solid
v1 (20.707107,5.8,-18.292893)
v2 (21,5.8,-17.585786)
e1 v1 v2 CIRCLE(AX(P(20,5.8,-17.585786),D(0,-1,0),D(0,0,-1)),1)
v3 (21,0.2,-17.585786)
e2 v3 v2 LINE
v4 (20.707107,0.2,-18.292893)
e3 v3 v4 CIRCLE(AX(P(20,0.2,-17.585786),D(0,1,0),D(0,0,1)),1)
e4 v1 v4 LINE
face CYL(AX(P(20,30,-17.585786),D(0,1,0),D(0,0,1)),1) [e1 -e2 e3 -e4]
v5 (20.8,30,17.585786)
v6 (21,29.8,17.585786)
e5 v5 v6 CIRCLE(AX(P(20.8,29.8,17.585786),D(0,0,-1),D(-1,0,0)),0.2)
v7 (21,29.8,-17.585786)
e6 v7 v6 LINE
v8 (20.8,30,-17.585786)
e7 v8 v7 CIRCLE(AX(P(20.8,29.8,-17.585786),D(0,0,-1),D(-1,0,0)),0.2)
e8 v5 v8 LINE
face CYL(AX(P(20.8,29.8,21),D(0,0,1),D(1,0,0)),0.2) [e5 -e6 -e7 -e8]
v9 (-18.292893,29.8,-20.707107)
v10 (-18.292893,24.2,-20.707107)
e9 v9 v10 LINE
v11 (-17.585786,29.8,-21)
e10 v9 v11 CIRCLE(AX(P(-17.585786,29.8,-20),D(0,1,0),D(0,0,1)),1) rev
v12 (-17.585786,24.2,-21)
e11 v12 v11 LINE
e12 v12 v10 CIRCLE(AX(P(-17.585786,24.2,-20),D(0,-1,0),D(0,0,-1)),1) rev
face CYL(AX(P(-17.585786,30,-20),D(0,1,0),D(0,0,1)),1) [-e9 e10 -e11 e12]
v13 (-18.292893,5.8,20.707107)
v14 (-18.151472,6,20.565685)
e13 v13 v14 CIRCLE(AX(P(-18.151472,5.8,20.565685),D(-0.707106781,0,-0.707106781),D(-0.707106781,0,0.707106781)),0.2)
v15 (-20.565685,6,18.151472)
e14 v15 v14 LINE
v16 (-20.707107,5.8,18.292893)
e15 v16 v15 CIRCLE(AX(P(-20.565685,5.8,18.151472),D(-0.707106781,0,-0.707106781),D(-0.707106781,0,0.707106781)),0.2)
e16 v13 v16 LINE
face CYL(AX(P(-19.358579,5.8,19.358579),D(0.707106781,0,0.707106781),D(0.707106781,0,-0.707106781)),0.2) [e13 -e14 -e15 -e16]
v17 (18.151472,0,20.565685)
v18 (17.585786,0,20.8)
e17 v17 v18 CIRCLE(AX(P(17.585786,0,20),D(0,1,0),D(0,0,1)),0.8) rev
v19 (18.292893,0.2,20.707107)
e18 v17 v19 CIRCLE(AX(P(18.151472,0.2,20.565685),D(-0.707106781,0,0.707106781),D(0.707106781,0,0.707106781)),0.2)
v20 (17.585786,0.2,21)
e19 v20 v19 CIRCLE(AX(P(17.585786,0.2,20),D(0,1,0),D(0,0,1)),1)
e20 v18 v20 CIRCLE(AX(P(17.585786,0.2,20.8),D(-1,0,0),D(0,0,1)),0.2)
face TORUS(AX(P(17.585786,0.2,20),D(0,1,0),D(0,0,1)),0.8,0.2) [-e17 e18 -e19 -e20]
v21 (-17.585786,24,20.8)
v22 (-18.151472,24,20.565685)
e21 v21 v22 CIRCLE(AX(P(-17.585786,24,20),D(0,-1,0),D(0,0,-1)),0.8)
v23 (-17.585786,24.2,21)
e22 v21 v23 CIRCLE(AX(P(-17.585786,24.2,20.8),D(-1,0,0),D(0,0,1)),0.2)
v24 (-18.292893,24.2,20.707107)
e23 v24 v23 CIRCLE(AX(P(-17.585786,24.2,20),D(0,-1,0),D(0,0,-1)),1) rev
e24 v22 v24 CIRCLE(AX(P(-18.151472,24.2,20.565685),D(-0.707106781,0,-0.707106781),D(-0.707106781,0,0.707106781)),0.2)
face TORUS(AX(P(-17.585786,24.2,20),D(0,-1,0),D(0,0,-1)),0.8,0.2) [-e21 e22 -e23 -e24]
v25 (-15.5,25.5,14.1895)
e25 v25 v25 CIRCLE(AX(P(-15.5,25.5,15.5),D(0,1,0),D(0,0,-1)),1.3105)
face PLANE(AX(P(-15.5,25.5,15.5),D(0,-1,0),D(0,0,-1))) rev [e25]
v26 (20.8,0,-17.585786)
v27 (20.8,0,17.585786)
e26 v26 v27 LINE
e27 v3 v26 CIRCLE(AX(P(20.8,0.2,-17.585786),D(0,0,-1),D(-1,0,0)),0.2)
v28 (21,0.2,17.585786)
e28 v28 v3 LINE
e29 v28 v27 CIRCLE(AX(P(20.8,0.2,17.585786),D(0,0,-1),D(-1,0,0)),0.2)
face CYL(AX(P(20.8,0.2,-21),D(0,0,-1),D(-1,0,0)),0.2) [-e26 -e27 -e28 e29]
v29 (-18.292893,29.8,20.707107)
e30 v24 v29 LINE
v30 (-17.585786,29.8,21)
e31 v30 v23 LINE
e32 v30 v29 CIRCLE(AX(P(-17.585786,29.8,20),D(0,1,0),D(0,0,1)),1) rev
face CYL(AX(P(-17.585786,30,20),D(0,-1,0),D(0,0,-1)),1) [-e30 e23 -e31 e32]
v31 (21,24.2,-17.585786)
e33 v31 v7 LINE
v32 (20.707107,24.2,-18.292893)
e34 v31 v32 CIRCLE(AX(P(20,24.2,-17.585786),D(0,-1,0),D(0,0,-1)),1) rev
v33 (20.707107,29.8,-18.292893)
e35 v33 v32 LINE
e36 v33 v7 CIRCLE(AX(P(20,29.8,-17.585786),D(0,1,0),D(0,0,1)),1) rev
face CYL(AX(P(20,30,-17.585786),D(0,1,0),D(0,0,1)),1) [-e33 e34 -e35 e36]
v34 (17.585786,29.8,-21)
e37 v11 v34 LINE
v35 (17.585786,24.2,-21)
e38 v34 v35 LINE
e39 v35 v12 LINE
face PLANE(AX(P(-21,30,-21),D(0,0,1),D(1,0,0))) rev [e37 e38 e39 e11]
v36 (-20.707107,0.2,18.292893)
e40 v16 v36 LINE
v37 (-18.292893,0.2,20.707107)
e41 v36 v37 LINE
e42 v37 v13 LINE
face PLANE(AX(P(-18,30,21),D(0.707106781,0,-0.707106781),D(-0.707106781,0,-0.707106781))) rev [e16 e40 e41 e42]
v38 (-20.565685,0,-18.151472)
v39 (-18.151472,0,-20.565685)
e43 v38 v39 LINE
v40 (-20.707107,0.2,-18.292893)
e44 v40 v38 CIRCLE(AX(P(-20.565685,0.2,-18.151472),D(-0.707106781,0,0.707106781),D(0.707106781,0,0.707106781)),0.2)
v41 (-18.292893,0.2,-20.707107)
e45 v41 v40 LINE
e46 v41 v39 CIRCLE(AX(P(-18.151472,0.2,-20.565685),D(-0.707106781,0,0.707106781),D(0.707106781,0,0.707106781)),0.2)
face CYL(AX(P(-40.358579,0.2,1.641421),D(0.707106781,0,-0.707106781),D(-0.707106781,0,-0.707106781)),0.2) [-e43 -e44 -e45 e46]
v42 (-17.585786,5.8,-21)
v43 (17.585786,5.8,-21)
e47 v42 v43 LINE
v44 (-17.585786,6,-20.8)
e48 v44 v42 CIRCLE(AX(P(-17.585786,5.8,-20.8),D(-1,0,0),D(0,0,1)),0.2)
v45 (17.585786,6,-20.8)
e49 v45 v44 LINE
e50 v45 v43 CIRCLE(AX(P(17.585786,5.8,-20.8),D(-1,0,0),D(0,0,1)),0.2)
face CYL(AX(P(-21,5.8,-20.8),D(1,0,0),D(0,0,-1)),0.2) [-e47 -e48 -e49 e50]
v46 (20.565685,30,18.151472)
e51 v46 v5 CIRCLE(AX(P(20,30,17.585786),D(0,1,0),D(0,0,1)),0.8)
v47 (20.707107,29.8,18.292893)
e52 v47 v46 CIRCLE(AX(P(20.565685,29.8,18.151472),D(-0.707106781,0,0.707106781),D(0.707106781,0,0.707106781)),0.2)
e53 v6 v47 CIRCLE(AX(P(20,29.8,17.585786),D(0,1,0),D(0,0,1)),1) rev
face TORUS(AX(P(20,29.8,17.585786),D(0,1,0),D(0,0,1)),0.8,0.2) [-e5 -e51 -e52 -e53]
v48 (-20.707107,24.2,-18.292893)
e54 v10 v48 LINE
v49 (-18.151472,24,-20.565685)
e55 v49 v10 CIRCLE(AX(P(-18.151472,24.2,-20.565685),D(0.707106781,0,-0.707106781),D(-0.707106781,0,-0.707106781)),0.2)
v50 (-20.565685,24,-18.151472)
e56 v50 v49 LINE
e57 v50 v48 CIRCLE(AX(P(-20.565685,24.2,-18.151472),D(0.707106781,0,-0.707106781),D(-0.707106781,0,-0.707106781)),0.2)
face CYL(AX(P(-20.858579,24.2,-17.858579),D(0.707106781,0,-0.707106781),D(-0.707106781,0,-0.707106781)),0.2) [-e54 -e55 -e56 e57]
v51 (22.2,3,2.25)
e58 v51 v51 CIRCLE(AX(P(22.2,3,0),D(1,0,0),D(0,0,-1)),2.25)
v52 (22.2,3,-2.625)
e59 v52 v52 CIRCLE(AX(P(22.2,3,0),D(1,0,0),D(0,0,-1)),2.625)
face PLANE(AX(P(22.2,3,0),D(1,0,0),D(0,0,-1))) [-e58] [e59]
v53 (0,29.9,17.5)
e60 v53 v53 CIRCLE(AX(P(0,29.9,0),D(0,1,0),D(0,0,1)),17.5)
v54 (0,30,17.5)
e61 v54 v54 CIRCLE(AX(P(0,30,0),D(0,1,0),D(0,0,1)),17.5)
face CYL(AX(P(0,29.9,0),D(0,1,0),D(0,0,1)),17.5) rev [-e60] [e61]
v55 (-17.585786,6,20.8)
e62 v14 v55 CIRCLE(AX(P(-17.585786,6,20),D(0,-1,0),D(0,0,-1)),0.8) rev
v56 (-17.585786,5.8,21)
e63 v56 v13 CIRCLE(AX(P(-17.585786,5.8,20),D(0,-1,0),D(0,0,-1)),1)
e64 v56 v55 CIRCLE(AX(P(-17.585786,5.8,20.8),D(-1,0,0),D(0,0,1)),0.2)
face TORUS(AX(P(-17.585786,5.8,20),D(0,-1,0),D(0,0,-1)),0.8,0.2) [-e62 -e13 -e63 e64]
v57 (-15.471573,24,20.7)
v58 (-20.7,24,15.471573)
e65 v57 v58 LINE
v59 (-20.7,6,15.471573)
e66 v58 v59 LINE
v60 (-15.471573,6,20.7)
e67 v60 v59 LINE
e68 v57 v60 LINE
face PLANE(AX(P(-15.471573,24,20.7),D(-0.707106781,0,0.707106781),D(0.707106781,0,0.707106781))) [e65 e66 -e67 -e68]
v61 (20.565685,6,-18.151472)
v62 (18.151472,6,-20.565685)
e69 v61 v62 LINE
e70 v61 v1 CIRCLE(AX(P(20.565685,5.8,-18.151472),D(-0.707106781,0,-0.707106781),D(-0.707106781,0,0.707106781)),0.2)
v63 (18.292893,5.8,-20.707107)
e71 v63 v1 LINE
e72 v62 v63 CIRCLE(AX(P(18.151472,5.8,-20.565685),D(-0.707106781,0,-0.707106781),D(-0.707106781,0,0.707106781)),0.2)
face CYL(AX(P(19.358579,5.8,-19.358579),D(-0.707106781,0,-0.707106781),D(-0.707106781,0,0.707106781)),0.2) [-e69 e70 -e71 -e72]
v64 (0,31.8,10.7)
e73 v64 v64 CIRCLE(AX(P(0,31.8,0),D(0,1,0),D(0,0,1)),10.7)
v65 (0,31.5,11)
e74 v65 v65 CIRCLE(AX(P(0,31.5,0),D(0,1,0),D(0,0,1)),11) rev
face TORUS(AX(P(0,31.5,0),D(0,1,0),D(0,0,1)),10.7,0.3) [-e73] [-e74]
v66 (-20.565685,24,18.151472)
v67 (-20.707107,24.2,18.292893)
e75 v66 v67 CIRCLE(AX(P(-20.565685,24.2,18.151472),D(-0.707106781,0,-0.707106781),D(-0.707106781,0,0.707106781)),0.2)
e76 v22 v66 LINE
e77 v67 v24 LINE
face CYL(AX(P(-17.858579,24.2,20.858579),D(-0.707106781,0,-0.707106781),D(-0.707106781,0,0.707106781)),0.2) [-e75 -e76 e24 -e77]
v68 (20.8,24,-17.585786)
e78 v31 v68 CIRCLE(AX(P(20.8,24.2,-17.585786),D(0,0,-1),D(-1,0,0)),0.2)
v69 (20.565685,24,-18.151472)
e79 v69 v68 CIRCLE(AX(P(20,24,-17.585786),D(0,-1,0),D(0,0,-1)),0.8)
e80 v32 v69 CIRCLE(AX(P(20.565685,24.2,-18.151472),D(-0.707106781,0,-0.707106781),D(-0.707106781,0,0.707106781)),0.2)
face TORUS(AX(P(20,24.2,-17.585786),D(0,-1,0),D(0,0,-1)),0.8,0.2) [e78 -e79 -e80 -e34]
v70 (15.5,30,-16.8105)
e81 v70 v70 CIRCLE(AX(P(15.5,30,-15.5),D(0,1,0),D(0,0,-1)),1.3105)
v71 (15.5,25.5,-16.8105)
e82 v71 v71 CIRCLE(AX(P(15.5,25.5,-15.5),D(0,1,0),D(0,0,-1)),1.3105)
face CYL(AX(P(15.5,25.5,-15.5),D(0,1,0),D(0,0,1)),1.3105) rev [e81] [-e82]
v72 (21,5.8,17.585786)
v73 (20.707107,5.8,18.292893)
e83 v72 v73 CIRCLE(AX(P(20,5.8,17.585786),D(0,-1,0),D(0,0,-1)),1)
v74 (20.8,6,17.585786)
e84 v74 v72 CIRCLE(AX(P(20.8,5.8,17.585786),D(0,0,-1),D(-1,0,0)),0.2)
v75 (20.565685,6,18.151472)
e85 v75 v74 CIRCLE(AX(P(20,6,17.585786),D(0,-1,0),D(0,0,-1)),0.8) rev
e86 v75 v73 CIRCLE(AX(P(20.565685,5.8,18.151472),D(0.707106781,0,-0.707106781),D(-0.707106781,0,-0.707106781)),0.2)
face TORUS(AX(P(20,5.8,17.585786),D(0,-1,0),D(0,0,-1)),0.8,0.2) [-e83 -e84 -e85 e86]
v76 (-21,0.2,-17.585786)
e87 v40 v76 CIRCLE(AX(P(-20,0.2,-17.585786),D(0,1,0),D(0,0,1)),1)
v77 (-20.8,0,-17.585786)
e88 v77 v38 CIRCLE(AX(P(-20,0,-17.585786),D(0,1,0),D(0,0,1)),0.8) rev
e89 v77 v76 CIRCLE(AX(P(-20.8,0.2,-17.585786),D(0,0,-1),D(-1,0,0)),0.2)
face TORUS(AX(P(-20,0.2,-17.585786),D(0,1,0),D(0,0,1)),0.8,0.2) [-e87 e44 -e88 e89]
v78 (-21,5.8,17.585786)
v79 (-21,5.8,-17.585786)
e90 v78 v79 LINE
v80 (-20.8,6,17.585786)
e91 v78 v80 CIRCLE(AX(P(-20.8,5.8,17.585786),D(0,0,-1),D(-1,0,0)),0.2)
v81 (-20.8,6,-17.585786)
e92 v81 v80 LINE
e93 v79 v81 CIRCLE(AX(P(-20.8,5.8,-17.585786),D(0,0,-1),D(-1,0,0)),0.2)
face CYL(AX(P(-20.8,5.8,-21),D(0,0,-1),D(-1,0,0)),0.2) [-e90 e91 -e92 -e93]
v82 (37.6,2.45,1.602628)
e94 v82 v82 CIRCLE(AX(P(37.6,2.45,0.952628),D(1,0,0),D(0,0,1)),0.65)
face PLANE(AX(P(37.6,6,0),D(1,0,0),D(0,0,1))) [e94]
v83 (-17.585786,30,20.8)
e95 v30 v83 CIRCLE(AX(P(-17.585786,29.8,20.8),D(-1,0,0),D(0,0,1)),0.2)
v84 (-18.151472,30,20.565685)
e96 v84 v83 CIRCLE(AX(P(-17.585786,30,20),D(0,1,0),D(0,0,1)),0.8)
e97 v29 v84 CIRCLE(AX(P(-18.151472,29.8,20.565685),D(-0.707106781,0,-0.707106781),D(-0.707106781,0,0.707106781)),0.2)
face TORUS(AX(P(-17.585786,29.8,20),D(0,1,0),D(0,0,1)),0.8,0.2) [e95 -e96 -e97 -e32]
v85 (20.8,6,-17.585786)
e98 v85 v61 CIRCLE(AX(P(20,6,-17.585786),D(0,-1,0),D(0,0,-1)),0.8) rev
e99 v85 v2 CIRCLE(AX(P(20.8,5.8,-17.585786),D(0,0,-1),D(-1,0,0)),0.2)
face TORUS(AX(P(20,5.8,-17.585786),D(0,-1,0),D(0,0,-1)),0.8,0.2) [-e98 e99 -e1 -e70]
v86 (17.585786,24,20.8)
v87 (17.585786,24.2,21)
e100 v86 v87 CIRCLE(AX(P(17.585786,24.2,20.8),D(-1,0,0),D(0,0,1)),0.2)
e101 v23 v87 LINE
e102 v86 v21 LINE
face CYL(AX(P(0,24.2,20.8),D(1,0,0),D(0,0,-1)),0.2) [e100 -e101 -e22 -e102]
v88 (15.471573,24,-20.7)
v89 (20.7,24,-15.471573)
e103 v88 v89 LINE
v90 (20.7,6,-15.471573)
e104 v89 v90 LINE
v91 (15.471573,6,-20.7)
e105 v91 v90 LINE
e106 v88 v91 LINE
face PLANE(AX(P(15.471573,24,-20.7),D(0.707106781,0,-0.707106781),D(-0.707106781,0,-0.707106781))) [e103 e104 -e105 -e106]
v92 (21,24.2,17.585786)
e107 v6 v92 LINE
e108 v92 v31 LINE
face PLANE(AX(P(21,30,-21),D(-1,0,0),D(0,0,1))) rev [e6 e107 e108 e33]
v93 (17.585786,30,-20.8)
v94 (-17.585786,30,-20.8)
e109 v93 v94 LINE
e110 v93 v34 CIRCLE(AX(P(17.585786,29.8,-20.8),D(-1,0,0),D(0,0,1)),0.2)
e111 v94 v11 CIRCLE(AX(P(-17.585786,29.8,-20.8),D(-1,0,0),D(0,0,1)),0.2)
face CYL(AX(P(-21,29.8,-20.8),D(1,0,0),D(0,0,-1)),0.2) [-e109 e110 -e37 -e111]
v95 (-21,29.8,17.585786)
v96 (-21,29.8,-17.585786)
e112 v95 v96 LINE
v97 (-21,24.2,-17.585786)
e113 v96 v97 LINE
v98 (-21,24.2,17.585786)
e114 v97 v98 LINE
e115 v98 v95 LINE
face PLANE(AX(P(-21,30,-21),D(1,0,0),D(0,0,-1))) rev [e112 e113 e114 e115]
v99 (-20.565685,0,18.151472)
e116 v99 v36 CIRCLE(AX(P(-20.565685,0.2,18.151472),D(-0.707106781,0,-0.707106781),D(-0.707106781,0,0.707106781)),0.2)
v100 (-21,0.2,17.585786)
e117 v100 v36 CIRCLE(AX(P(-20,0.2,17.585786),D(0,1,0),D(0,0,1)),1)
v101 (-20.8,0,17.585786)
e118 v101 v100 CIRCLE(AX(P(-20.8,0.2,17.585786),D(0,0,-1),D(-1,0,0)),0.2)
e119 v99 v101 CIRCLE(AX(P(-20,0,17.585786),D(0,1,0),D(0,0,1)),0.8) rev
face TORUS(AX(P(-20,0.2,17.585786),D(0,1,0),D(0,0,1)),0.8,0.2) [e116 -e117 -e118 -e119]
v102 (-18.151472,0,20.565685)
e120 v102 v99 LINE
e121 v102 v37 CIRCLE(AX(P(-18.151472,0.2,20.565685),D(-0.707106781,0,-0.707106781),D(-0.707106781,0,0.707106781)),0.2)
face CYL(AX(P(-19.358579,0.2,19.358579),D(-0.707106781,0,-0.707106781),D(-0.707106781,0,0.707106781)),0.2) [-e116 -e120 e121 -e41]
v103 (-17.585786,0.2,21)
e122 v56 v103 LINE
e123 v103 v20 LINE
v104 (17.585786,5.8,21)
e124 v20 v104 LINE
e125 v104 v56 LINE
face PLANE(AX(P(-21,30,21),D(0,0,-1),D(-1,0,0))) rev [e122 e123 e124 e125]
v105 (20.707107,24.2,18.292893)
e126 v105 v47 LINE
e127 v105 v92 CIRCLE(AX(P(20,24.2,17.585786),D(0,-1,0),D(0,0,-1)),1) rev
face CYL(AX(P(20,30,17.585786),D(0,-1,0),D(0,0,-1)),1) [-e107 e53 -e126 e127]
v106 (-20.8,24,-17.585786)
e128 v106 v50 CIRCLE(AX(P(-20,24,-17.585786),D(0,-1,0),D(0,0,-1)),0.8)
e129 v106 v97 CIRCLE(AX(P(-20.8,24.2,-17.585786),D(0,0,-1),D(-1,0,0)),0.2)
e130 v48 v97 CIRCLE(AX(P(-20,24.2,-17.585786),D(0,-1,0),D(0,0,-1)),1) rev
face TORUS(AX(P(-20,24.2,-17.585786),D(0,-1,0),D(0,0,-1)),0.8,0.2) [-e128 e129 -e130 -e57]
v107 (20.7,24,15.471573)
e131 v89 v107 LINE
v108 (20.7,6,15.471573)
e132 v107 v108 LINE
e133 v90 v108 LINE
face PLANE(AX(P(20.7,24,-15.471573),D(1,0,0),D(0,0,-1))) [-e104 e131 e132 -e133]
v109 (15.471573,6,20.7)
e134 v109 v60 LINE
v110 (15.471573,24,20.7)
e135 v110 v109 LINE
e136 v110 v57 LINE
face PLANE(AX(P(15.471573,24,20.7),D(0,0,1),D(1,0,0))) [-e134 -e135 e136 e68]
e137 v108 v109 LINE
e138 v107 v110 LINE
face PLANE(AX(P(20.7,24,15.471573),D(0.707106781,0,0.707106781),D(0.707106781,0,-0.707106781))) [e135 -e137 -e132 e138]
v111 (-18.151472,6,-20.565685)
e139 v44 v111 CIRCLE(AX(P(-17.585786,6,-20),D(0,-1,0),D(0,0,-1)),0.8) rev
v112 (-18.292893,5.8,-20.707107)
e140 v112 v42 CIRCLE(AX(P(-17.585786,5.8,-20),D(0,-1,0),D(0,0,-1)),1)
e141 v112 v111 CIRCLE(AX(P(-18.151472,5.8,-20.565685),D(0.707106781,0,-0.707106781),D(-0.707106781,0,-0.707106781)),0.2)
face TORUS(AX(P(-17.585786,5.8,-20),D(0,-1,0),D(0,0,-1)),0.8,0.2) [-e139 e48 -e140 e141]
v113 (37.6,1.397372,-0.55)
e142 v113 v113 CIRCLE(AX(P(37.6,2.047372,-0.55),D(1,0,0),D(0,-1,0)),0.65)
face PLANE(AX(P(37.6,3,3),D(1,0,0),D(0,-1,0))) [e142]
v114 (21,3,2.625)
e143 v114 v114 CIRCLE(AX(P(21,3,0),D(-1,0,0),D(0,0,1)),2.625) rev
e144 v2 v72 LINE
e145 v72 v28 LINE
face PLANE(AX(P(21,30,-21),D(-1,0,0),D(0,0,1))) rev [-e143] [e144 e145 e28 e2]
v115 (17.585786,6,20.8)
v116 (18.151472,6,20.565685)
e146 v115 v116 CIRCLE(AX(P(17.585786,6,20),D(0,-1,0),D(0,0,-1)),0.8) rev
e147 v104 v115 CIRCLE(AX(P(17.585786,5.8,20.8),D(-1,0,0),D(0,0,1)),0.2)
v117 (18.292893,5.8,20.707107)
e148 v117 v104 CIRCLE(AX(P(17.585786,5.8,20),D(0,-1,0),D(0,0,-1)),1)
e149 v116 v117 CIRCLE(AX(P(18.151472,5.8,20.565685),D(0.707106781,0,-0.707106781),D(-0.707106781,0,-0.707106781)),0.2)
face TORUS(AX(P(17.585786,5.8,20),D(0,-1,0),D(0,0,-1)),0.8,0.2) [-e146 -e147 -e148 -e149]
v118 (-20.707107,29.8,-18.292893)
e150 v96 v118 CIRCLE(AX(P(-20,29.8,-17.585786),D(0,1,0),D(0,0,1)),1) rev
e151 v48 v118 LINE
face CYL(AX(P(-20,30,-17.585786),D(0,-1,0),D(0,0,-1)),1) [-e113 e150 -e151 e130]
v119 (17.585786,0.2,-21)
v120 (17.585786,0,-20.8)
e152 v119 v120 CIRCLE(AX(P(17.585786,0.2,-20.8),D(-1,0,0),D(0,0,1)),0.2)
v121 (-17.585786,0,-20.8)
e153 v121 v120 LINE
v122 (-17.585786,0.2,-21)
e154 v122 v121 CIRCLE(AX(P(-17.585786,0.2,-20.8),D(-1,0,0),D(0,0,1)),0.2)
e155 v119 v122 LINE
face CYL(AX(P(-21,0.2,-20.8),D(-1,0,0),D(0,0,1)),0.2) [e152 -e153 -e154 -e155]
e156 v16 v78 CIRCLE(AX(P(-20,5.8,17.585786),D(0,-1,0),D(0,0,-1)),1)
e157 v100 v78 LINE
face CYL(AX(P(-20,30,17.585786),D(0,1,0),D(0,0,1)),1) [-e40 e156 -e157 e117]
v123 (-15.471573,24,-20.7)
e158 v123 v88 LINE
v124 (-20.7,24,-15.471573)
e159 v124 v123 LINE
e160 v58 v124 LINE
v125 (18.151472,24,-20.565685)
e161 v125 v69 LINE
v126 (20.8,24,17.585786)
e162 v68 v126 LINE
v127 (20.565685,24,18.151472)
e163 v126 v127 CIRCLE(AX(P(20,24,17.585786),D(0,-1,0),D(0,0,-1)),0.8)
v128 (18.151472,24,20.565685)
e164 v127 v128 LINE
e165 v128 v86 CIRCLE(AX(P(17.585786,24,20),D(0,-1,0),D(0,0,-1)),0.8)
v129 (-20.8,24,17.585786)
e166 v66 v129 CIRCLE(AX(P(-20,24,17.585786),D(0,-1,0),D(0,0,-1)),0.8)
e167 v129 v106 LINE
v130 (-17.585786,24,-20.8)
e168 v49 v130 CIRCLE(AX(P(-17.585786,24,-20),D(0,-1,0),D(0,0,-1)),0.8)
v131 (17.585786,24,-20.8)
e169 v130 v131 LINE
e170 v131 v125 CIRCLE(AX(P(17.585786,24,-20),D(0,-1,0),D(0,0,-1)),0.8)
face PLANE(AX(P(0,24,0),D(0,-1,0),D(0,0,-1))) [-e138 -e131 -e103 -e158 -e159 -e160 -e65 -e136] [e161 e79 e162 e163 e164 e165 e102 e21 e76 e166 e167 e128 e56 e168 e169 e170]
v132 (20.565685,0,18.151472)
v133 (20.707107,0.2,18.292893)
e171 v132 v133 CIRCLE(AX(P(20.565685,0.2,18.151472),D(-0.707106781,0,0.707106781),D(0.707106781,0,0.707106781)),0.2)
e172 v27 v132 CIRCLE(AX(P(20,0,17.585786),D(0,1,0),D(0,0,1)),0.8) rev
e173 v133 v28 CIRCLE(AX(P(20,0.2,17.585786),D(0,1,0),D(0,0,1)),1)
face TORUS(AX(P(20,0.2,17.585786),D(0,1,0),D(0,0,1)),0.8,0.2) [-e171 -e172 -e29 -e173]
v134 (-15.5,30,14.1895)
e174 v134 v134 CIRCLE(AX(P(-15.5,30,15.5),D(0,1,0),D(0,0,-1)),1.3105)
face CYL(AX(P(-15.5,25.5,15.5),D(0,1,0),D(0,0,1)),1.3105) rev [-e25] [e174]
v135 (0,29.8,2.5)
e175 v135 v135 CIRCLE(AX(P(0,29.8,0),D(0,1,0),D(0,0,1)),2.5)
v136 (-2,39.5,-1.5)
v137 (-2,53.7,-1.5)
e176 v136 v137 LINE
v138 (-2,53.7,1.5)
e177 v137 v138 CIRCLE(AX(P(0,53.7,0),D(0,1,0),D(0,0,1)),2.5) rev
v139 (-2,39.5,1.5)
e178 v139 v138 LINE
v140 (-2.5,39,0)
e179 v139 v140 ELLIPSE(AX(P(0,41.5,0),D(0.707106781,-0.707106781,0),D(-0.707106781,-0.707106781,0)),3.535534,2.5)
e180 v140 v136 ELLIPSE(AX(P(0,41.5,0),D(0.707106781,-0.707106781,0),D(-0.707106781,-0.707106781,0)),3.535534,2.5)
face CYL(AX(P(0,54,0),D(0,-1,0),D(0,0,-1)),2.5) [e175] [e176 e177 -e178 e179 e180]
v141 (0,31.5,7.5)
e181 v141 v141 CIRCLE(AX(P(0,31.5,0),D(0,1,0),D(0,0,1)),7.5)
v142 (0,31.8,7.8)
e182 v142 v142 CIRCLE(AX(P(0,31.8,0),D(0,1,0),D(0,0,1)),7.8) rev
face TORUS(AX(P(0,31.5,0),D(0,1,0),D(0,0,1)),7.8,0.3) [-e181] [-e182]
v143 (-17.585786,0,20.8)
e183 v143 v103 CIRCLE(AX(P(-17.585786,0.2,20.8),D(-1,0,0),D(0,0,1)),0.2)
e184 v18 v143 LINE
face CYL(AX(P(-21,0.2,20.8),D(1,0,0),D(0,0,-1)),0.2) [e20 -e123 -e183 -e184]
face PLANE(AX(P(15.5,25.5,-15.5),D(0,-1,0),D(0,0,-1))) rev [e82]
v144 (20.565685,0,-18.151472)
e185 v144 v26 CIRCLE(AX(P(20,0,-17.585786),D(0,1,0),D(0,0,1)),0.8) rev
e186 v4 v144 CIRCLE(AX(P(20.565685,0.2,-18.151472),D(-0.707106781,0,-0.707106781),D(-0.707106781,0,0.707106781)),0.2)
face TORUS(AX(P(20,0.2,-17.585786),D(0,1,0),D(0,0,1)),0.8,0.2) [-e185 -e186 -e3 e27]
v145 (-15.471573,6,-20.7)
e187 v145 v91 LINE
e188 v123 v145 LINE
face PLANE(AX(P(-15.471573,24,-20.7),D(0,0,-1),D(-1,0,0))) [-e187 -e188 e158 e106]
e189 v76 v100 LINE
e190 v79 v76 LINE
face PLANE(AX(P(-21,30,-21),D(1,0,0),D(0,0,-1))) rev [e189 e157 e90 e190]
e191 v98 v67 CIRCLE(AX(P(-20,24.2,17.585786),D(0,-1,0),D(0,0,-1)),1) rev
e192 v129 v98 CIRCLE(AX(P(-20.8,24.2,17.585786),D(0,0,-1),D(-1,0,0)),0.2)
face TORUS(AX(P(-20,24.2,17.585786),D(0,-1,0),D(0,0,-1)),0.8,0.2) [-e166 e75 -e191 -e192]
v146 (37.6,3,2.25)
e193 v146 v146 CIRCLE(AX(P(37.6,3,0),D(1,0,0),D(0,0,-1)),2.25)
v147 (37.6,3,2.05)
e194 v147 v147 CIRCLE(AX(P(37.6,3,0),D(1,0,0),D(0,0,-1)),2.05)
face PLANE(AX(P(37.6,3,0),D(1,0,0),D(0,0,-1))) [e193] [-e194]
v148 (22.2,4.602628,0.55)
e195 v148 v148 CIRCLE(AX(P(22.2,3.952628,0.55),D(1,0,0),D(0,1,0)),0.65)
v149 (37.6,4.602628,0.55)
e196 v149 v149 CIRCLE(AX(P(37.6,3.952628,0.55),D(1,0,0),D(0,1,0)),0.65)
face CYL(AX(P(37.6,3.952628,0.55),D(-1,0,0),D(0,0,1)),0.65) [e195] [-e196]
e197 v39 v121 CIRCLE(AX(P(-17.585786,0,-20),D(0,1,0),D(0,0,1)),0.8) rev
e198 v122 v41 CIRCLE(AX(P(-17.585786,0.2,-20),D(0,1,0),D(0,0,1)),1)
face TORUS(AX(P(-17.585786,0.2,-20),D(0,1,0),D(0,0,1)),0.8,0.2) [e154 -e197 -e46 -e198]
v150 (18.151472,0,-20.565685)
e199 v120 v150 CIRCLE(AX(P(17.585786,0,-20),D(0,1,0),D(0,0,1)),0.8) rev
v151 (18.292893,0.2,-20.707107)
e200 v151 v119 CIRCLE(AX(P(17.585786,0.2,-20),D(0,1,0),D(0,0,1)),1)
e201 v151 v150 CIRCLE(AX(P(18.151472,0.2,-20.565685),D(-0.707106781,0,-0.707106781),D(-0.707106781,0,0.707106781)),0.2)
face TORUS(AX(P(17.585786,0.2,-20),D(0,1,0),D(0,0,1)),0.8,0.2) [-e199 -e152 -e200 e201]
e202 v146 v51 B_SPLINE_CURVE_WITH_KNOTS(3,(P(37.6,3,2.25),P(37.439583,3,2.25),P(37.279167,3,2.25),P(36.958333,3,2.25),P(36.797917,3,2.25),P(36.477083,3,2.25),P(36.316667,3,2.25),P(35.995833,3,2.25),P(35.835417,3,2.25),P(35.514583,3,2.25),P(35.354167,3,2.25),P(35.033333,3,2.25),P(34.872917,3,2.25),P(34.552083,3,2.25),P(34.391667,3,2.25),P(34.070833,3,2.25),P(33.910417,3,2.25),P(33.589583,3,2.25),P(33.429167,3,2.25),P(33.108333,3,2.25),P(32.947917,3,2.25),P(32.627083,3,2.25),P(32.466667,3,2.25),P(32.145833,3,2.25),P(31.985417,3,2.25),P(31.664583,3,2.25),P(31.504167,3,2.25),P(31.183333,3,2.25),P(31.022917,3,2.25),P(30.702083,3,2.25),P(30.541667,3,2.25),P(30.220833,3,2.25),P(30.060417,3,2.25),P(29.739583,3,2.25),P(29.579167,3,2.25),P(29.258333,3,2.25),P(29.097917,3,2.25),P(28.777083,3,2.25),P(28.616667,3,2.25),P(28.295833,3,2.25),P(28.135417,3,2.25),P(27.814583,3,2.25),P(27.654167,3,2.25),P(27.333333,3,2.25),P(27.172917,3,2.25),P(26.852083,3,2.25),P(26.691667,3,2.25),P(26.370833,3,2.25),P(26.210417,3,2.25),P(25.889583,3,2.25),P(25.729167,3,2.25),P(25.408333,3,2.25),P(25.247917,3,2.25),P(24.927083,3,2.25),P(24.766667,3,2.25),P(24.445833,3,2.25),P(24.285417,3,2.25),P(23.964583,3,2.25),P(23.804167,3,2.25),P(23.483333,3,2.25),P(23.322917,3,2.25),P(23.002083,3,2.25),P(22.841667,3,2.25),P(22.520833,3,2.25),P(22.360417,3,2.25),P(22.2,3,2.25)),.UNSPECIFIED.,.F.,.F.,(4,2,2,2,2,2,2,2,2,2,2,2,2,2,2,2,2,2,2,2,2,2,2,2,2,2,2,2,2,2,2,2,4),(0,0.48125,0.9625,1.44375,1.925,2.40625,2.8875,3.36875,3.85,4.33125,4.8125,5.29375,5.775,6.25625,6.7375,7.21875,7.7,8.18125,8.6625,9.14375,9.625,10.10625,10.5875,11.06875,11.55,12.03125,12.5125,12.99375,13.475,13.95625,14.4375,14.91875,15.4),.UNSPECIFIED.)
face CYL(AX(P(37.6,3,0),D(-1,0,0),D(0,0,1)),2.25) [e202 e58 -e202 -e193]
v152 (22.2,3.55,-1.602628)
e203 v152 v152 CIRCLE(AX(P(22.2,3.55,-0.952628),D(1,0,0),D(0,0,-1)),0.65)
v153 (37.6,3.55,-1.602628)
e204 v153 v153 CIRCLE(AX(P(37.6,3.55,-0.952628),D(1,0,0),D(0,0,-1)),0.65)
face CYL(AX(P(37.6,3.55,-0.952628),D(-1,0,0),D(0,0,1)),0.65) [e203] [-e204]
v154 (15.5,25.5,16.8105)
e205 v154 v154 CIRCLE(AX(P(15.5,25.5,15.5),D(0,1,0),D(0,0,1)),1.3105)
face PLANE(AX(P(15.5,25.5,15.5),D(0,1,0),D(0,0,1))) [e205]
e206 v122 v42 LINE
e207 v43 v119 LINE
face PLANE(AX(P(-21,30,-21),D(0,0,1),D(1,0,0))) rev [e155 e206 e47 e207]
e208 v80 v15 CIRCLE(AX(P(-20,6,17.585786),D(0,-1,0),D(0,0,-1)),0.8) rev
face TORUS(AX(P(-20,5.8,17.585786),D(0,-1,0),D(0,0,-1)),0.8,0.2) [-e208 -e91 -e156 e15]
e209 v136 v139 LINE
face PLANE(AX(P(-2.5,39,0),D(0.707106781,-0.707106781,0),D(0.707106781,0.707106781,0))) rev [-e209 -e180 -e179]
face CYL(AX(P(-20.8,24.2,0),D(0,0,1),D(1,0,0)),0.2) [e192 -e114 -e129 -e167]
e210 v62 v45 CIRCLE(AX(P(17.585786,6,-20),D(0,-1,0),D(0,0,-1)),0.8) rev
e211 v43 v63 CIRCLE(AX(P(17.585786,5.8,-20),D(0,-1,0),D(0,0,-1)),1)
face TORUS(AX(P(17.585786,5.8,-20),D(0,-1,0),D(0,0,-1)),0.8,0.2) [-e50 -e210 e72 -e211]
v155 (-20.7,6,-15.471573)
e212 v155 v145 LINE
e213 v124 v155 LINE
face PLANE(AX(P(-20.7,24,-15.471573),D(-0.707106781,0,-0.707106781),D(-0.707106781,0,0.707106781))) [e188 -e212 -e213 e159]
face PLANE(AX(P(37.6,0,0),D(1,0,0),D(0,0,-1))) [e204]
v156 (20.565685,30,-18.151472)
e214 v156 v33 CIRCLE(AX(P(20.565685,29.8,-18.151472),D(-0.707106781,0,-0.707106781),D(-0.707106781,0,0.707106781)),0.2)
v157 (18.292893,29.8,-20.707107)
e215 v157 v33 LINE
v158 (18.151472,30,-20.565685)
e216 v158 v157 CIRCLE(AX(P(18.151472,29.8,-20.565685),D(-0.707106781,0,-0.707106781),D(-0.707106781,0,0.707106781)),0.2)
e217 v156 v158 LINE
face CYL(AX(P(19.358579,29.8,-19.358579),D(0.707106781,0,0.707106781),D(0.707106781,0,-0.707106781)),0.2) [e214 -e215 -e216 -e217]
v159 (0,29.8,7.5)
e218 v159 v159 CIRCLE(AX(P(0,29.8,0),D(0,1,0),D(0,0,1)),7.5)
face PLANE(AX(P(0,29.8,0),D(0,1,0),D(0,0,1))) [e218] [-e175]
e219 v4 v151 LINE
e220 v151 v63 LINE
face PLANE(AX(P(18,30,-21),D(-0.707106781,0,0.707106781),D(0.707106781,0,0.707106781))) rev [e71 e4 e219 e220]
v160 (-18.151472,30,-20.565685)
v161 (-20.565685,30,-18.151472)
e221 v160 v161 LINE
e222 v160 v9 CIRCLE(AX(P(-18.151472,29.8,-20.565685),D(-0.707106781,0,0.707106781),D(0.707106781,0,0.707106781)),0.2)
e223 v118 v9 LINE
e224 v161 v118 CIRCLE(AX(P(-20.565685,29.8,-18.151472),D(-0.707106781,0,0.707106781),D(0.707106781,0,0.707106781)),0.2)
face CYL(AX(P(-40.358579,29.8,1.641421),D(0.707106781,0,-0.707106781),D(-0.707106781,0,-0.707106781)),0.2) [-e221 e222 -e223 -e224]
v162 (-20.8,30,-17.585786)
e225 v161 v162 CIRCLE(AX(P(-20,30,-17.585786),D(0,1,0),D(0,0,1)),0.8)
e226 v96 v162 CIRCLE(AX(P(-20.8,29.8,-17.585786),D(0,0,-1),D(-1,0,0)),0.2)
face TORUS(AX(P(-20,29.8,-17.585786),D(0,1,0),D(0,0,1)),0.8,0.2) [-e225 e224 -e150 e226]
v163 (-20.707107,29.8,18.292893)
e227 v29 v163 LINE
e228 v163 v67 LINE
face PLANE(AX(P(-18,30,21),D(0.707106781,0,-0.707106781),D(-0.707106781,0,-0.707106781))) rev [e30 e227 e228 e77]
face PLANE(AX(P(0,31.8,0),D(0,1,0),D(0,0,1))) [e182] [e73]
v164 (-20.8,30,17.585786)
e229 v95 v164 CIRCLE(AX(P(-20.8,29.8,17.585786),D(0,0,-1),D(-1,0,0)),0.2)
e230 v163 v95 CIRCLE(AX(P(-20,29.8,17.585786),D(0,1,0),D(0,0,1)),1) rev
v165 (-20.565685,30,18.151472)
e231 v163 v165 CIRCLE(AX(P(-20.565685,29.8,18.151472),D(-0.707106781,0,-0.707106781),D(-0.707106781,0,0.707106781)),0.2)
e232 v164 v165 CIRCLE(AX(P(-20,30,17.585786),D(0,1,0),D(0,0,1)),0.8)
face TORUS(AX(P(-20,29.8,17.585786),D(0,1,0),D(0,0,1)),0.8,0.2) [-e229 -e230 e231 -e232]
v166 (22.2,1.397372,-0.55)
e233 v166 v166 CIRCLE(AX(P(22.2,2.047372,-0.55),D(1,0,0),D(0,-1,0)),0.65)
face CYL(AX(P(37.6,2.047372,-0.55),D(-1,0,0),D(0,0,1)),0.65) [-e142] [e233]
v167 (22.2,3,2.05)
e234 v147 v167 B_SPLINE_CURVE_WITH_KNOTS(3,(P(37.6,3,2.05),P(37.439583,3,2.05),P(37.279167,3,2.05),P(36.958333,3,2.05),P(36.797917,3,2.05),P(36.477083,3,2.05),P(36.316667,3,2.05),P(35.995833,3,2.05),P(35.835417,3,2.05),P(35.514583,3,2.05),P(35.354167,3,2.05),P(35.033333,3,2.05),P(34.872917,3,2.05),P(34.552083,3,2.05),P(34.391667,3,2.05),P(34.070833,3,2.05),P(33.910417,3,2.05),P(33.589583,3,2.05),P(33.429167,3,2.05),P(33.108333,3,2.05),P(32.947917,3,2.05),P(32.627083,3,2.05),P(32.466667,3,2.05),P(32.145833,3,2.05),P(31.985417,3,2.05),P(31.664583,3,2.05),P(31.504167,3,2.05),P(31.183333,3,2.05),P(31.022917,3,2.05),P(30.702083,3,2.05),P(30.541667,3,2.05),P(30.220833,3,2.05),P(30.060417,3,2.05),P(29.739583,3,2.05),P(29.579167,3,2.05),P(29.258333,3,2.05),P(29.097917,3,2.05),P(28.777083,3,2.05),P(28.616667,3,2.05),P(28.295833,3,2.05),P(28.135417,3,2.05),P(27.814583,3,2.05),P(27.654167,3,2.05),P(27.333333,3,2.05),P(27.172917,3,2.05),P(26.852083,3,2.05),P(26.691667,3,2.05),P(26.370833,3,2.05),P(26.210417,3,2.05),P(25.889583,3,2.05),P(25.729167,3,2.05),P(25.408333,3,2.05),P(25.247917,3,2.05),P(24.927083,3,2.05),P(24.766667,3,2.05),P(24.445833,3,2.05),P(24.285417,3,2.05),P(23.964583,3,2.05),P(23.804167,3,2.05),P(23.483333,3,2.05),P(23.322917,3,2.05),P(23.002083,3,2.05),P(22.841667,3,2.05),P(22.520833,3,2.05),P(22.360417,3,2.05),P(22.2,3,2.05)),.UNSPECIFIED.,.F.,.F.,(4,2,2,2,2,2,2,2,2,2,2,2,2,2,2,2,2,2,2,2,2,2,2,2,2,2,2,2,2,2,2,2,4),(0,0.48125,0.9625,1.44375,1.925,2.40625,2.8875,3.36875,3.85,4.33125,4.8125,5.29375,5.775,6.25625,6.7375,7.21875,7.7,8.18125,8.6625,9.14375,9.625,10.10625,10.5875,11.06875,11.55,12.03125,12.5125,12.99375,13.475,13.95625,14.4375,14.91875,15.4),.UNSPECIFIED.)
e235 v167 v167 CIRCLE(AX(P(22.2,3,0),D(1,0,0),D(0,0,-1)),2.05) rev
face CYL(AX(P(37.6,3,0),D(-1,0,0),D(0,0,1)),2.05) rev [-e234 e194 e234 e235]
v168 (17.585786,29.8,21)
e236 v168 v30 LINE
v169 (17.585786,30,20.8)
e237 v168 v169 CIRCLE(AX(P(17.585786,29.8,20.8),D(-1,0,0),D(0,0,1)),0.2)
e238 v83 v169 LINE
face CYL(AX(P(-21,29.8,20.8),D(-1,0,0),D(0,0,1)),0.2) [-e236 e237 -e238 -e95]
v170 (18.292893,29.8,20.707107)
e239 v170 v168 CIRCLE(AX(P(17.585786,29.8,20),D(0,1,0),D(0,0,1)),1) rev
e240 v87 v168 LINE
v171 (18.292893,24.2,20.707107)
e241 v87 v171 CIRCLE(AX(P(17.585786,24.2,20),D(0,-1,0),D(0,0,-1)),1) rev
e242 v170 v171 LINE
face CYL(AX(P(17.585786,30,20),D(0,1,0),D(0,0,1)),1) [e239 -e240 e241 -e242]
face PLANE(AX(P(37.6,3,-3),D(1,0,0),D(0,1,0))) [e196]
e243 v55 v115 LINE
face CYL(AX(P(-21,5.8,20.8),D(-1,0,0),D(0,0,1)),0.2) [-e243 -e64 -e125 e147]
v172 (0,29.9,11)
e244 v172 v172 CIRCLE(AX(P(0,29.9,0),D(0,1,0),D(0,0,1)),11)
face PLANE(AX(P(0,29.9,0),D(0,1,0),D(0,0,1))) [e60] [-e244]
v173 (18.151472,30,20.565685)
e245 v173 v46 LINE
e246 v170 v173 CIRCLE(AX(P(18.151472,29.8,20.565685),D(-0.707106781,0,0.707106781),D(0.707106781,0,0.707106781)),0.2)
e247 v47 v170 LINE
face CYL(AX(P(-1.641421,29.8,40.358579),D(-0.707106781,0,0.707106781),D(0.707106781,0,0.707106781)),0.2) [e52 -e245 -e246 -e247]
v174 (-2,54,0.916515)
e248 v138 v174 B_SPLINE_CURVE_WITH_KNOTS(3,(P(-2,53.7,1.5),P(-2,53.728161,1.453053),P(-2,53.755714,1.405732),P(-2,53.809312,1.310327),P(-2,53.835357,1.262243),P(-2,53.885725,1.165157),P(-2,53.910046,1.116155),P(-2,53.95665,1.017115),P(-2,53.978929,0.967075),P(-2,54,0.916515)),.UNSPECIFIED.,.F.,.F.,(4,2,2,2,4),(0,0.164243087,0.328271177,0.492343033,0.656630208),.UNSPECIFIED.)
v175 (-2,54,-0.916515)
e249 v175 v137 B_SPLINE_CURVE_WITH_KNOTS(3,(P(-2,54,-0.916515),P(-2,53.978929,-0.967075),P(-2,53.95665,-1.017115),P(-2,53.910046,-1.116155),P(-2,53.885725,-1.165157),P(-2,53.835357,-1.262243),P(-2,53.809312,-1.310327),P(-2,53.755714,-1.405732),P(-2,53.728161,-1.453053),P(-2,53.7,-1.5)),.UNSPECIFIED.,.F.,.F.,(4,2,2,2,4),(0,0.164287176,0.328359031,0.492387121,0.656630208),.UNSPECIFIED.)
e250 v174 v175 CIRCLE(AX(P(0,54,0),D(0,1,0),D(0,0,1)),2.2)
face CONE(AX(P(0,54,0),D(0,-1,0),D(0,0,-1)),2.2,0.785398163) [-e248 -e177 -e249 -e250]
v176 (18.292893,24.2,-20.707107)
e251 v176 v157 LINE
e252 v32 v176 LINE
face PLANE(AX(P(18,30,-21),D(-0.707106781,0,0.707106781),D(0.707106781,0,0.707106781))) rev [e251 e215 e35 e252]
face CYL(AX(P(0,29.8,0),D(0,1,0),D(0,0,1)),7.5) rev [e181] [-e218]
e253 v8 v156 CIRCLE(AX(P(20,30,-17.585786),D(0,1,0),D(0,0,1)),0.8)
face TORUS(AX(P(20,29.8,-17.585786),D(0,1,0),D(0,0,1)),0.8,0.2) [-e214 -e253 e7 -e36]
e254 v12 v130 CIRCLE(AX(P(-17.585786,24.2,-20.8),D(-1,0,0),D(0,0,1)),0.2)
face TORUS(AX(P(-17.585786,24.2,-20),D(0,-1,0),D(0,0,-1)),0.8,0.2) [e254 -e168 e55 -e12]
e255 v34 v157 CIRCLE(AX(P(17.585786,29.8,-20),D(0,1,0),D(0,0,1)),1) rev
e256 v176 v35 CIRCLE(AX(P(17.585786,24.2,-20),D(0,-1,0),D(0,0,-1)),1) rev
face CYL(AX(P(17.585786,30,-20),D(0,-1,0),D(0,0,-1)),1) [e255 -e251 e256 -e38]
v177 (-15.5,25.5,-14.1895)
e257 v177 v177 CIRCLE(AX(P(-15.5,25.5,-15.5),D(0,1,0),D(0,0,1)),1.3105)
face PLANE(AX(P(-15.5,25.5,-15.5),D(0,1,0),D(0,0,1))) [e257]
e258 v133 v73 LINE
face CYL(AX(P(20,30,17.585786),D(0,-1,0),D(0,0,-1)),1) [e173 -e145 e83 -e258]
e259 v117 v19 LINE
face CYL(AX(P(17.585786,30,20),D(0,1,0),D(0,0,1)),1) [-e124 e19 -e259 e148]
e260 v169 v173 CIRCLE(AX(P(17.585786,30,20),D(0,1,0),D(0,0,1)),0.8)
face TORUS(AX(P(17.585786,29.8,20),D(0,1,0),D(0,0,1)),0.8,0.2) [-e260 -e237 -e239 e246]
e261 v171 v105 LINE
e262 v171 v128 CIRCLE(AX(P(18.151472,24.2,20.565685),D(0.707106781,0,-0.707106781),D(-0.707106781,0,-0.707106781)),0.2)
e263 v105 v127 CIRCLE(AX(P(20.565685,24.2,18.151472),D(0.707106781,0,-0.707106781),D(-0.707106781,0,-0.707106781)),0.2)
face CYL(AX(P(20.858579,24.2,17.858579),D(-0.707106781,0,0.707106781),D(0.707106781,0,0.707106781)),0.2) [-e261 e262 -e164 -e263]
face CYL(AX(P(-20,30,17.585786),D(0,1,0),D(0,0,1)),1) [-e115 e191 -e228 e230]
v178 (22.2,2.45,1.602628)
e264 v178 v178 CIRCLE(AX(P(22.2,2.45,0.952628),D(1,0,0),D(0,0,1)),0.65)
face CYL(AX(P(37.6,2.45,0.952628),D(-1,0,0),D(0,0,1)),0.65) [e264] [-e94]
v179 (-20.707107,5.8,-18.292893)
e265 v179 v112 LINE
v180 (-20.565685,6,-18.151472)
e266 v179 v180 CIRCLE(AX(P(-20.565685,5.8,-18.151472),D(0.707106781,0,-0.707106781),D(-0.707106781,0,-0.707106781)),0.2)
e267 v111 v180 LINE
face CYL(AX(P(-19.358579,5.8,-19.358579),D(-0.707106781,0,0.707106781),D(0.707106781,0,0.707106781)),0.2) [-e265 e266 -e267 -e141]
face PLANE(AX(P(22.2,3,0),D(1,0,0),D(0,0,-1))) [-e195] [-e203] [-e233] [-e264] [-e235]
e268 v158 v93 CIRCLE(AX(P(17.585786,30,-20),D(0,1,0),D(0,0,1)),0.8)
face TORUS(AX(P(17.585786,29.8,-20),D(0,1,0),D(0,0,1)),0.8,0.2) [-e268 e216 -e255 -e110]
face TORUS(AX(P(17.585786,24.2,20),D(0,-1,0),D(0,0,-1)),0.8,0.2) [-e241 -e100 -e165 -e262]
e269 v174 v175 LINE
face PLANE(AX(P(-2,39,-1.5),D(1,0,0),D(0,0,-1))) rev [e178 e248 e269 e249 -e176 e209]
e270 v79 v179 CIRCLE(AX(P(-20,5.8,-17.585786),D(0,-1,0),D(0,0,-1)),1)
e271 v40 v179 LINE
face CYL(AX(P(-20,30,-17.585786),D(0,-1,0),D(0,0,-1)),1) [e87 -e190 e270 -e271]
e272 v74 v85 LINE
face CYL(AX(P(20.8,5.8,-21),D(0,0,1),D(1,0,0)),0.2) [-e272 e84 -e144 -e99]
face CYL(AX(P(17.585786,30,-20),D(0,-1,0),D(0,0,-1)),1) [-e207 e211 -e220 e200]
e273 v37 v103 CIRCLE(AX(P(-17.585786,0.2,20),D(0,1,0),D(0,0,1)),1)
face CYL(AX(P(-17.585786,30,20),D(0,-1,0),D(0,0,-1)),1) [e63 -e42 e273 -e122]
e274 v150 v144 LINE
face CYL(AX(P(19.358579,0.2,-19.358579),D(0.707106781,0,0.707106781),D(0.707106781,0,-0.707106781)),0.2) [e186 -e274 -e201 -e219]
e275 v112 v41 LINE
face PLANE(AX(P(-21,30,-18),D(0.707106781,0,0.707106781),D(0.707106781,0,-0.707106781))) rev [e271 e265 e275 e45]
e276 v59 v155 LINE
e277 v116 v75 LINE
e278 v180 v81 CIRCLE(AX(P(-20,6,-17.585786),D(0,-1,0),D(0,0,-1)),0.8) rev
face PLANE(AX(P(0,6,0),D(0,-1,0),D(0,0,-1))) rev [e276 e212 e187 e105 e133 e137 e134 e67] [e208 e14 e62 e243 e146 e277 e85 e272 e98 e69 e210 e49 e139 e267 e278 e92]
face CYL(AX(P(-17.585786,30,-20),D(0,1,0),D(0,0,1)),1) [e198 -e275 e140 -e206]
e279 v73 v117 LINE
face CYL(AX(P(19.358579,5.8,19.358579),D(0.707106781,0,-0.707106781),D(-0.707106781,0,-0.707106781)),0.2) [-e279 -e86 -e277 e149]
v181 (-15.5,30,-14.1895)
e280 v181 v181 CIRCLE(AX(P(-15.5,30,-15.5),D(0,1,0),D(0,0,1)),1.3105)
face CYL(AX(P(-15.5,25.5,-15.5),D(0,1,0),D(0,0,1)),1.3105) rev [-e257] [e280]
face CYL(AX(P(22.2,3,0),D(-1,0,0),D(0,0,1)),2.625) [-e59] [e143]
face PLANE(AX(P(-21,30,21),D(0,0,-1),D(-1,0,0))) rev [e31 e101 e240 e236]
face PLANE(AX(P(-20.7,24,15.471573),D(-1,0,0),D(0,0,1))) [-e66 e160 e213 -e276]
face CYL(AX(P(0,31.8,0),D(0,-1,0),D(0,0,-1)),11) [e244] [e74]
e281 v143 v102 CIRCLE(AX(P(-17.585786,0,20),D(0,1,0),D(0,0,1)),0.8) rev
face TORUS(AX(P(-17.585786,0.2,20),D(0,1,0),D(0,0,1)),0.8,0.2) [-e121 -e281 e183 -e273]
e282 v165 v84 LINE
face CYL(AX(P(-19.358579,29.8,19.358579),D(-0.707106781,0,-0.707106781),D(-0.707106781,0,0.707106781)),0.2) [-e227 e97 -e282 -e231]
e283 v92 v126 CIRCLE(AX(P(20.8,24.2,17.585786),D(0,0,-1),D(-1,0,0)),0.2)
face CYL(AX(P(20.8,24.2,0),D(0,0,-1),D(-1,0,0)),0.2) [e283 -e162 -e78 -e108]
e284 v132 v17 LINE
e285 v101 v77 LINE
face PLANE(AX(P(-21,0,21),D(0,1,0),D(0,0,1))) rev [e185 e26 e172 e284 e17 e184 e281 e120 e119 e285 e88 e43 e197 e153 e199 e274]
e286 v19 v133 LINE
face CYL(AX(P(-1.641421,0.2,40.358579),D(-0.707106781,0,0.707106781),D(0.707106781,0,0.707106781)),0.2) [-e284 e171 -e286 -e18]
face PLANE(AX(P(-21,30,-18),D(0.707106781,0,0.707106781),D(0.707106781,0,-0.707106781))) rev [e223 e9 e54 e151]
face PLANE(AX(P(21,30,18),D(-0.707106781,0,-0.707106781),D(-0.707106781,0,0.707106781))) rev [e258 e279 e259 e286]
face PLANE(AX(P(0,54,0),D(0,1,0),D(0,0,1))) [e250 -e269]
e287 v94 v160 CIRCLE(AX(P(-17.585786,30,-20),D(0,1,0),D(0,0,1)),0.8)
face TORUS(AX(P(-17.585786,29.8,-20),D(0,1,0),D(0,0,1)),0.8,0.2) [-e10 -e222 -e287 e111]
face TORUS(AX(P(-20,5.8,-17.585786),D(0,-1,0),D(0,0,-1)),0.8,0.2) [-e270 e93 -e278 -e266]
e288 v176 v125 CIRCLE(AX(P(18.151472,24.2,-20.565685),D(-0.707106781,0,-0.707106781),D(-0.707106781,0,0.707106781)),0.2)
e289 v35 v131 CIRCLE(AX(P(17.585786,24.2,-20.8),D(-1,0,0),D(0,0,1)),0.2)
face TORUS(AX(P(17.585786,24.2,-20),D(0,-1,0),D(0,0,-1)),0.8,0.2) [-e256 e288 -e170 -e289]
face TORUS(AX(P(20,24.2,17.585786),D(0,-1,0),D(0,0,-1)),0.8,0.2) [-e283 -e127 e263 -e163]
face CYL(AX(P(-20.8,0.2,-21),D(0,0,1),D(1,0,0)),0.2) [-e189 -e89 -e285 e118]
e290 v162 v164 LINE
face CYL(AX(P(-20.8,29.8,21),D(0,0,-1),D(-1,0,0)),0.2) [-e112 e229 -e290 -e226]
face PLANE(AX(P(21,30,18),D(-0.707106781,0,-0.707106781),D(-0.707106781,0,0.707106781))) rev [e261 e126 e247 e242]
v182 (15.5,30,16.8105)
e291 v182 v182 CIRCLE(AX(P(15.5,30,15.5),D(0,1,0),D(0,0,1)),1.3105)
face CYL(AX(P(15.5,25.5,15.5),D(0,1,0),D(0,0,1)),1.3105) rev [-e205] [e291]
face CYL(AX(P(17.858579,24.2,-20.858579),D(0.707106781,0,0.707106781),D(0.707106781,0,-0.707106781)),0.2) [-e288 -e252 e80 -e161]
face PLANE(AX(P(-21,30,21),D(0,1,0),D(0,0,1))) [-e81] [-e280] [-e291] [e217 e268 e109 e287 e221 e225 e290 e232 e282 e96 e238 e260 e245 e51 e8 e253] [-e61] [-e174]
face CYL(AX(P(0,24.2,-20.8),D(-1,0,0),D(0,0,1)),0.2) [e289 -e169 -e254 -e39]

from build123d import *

# Parameters (mm, degrees)
SKETCH_1_W               = 42
SKETCH_1_H               = 42
EXTRUDE_1_DEPTH          = 30
CHAMFER_3_SIZE           = 3
SKETCH_2_R               = 11
EXTRUDE_2_DEPTH          = 1.8
SKETCH_3_R               = 2.5
EXTRUDE_3_DEPTH          = 24
SKETCH_4_OUTSIDE_W       = 60.054
SKETCH_4_OUTSIDE_H       = 60.054
CUT_EXTRUDE_1_DEPTH      = 18
FILLET_2_R               = 1
FILLET_3_R               = 0.2
CUT_EXTRUDE_START        = -15
CUT_EXTRUDE_5_DEPTH      = 15
CHAMFER_5_SIZE           = 0.3
CHAMFER_4_SIZE           = 0.5
SKETCH_6_R               = 1.3105
CUT_EXTRUDE_2_DEPTH      = 4.5
CUT_EXTRUDE_START_2      = -2
SKETCH_7_R               = 7.5
SKETCH_7_R_2             = 2.5
CUT_EXTRUDE_3_DEPTH      = 2
SKETCH_8_R               = 2.625
EXTRUDE_5_DEPTH          = 1.2
SKETCH_9_R               = 2.25
SKETCH_9_R_2             = 2.05
EXTRUDE_6_DEPTH          = 15.4
SKETCH_10_R              = 0.65
EXTRUDE_8_DEPTH          = 15.4
CUT_EXTRUDE_START_3      = -0.1
SKETCH_15_R              = 17.5
SKETCH_15_R_2            = 11
CUT_EXTRUDE_6_DEPTH      = 0.1
FILLET_4_R               = 0.3
PATTERN_CIRCULAR_3_COUNT = 4


with BuildPart() as part:
    # 草图1 → 凸台-拉伸1 (new body)
    with BuildSketch(Plane(origin=(0, 0, 0), x_dir=(1, 0, 0), z_dir=(0, 1, 0))):
        Rectangle(SKETCH_1_W, SKETCH_1_H)
    extrude(amount=EXTRUDE_1_DEPTH)

    # 倒角3
    chamfer_3_edges = [part.edges().sort_by_distance(p)[0] for p in [
        (-21, 15, -21),
        (21, 15, -21),
        (21, 15, 21),
        (-21, 15, 21),
    ]]
    chamfer(chamfer_3_edges, length=CHAMFER_3_SIZE)

    # 草图2 → 凸台-拉伸2 (add)
    with BuildSketch(Plane(origin=(0, 30, 0), x_dir=(1, 0, 0), z_dir=(0, 1, 0))):
        with Locations(Location((0, 0, 0), (0, 0, 270))):
            Circle(SKETCH_2_R)
    extrude(amount=EXTRUDE_2_DEPTH)

    # 草图3 → 凸台-拉伸3 (add)
    with BuildSketch(Plane(origin=(0, 30, 0), x_dir=(1, 0, 0), z_dir=(0, 1, 0))):
        with Locations(Location((0, 0, 0), (0, 0, 270))):
            Circle(SKETCH_3_R)
    extrude(amount=EXTRUDE_3_DEPTH)

    # 草图4 outside → 切除-拉伸1 (cut)
    with BuildSketch(Plane.XZ.offset(-6)):
        Rectangle(SKETCH_4_OUTSIDE_W, SKETCH_4_OUTSIDE_H)
        Polygon((15.471572875, 20.7), (-15.471572875, 20.7), (-20.7, 15.471572875), (-20.7, -15.471572875), (-15.471572875, -20.7), (15.471572875, -20.7), (20.7, -15.471572875), (20.7, 15.471572875), align=None, mode=Mode.SUBTRACT)
    extrude(amount=-CUT_EXTRUDE_1_DEPTH, mode=Mode.SUBTRACT)

    # 圆角2
    fillet_2_edges = [part.edges().sort_by_distance(p)[0] for p in [
        (-18, 3, -21),
        (18, 27, -21),
        (21, 27, 18),
        (21, 3, -18),
        (-18, 27, 21),
        (18, 3, 21),
        (-21, 27, -18),
        (-21, 3, 18),
        (-18, 27, -21),
        (-21, 3, -18),
        (-21, 27, 18),
        (-18, 3, 21),
        (18, 27, 21),
        (21, 3, 18),
        (21, 27, -18),
        (18, 3, -21),
    ]]
    fillet(fillet_2_edges, radius=FILLET_2_R)

    # 圆角3
    fillet_3_edges = [part.edges().sort_by_distance(p)[0] for p in [
        (21, 6, 0),
        (21, 0, 0),
        (0, 0, -21),
        (19.5, 0, -19.5),
        (19.5, 0, 19.5),
        (0, 0, 21),
        (-19.5, 0, 19.5),
        (-21, 0, 0),
        (-19.5, 0, -19.5),
        (-20.923879533, 0, -17.96846987),
        (-17.96846987, 0, -20.923879533),
        (17.96846987, 0, -20.923879533),
        (20.923879533, 0, -17.96846987),
        (-20.923879533, 0, 17.96846987),
        (-17.96846987, 0, 20.923879533),
        (17.96846987, 0, 20.923879533),
        (20.923879533, 0, 17.96846987),
        (19.5, 6, 19.5),
        (19.5, 6, -19.5),
        (0, 6, -21),
        (-19.5, 6, -19.5),
        (-21, 6, 0),
        (-19.5, 6, 19.5),
        (0, 6, 21),
        (-20.923879533, 6, -17.96846987),
        (-17.96846987, 6, -20.923879533),
        (17.96846987, 6, -20.923879533),
        (20.923879533, 6, -17.96846987),
        (-20.923879533, 6, 17.96846987),
        (-17.96846987, 6, 20.923879533),
        (17.96846987, 6, 20.923879533),
        (20.923879533, 6, 17.96846987),
        (0, 24, -21),
        (0, 30, -21),
        (21, 30, 0),
        (19.5, 30, -19.5),
        (-19.5, 30, -19.5),
        (-21, 30, 0),
        (-19.5, 30, 19.5),
        (0, 30, 21),
        (19.5, 30, 19.5),
        (-20.923879533, 30, 17.96846987),
        (-17.96846987, 30, 20.923879533),
        (17.96846987, 30, 20.923879533),
        (20.923879533, 30, 17.96846987),
        (17.96846987, 30, -20.923879533),
        (20.923879533, 30, -17.96846987),
        (-20.923879533, 30, -17.96846987),
        (-17.96846987, 30, -20.923879533),
        (-19.5, 24, -19.5),
        (0, 24, 21),
        (-19.5, 24, 19.5),
        (-21, 24, 0),
        (19.5, 24, -19.5),
        (21, 24, 0),
        (19.5, 24, 19.5),
        (-20.923879533, 24, 17.96846987),
        (-17.96846987, 24, 20.923879533),
        (17.96846987, 24, 20.923879533),
        (20.923879533, 24, 17.96846987),
        (17.96846987, 24, -20.923879533),
        (20.923879533, 24, -17.96846987),
        (-20.923879533, 24, -17.96846987),
        (-17.96846987, 24, -20.923879533),
    ]]
    fillet(fillet_3_edges, radius=FILLET_3_R)

    # 草图14 → 切除-拉伸5 (cut)
    with BuildSketch(Plane(origin=(0, 54, 0), x_dir=(1, 0, 0), z_dir=(0, 1, 0)).offset(CUT_EXTRUDE_START)):
        with BuildLine():
            Line((-2, 1.5), (-2, -1.5))
            ThreePointArc((-2, -1.5), (-2.5, 0), (-2, 1.5))
        make_face()
    extrude(amount=CUT_EXTRUDE_5_DEPTH, mode=Mode.SUBTRACT)

    # 倒角5
    chamfer_5_edges = [part.edges().sort_by_distance(p)[0] for p in [
        (2.236067977, 54, -1.118033989),
    ]]
    chamfer(chamfer_5_edges, length=CHAMFER_5_SIZE)

    # 倒角4
    chamfer_4_edges = [part.edges().sort_by_distance(p)[0] for p in [
        (-2, 39, 0),
    ]]
    chamfer(chamfer_4_edges, length=CHAMFER_4_SIZE - 0.0001)  # a hair under: the kernel refuses the full size

    # 草图6 → 切除-拉伸2 (cut)
    with BuildSketch(Plane(origin=(0, 30, 0), x_dir=(1, 0, 0), z_dir=(0, 1, 0))):
        with Locations(Location((-15.5, 15.5, 0), (0, 0, 270))):
            Circle(SKETCH_6_R)
        with Locations(Location((15.5, 15.5, 0), (0, 0, 90))):
            Circle(SKETCH_6_R)
        with Locations(Location((15.5, -15.5, 0), (0, 0, 270))):
            Circle(SKETCH_6_R)
        with Locations(Location((-15.5, -15.5, 0), (0, 0, 90))):
            Circle(SKETCH_6_R)
    extrude(amount=-CUT_EXTRUDE_2_DEPTH, mode=Mode.SUBTRACT)

    # 草图7 → 切除-拉伸3 (cut)
    with BuildSketch(Plane(origin=(0, 31.8, 0), x_dir=(1, 0, 0), z_dir=(0, 1, 0)).offset(CUT_EXTRUDE_START_2)):
        with Locations(Location((0, 0, 0), (0, 0, 270))):
            Circle(SKETCH_7_R)
        with Locations(Location((0, 0, 0), (0, 0, 143.130102354))):
            Circle(SKETCH_7_R_2, mode=Mode.SUBTRACT)
    extrude(amount=CUT_EXTRUDE_3_DEPTH, mode=Mode.SUBTRACT)

    # 草图8 → 凸台-拉伸5 (add)
    with BuildSketch(Plane(origin=(21, 0, 0), x_dir=(0, 0, -1), z_dir=(1, 0, 0))):
        with Locations(Location((0, 3, 0), (0, 0, 180))):
            Circle(SKETCH_8_R)
    extrude(amount=EXTRUDE_5_DEPTH)

    # 草图9 → 凸台-拉伸6 (add)
    with BuildSketch(Plane(origin=(22.2, 0, 0), x_dir=(0, 0, -1), z_dir=(1, 0, 0))):
        with Locations(Location((0, 3, 0), (0, 0, 180))):
            Circle(SKETCH_9_R)
        with Locations(Location((0, 3, 0), (0, 0, 180))):
            Circle(SKETCH_9_R_2, mode=Mode.SUBTRACT)
    extrude(amount=EXTRUDE_6_DEPTH)

    # 草图10 → 凸台-拉伸8 (add)
    with BuildSketch(Plane(origin=(22.2, 0, 0), x_dir=(0, 0, -1), z_dir=(1, 0, 0))):
        with Locations((0.952627944, 3.55)):
            Circle(SKETCH_10_R)
    extrude_8 = extrude(amount=EXTRUDE_8_DEPTH)

    # 草图15 → 切除-拉伸6 (cut)
    with BuildSketch(Plane(origin=(0, 30, 0), x_dir=(1, 0, 0), z_dir=(0, 1, 0)).offset(CUT_EXTRUDE_START_3)):
        with Locations(Location((0, 0, 0), (0, 0, 270))):
            Circle(SKETCH_15_R)
        with Locations(Location((0, 0, 0), (0, 0, 270))):
            Circle(SKETCH_15_R_2, mode=Mode.SUBTRACT)
    extrude(amount=CUT_EXTRUDE_6_DEPTH, mode=Mode.SUBTRACT)

    # 圆角4
    fillet_4_edges = [part.edges().sort_by_distance(p)[0] for p in [
        (0, 31.8, -11),
        (0, 31.8, -7.5),
    ]]
    fillet(fillet_4_edges, radius=FILLET_4_R)

    # 阵列(圆周)3: 凸台-拉伸8 ×4 about axis
    pattern_circular_3_axis = Axis((0, 3, 0), (1, 0, 0))
    for i in range(1, PATTERN_CIRCULAR_3_COUNT):
        add(extrude_8.rotate(pattern_circular_3_axis, i * 360 / PATTERN_CIRCULAR_3_COUNT))


solid = part.part
